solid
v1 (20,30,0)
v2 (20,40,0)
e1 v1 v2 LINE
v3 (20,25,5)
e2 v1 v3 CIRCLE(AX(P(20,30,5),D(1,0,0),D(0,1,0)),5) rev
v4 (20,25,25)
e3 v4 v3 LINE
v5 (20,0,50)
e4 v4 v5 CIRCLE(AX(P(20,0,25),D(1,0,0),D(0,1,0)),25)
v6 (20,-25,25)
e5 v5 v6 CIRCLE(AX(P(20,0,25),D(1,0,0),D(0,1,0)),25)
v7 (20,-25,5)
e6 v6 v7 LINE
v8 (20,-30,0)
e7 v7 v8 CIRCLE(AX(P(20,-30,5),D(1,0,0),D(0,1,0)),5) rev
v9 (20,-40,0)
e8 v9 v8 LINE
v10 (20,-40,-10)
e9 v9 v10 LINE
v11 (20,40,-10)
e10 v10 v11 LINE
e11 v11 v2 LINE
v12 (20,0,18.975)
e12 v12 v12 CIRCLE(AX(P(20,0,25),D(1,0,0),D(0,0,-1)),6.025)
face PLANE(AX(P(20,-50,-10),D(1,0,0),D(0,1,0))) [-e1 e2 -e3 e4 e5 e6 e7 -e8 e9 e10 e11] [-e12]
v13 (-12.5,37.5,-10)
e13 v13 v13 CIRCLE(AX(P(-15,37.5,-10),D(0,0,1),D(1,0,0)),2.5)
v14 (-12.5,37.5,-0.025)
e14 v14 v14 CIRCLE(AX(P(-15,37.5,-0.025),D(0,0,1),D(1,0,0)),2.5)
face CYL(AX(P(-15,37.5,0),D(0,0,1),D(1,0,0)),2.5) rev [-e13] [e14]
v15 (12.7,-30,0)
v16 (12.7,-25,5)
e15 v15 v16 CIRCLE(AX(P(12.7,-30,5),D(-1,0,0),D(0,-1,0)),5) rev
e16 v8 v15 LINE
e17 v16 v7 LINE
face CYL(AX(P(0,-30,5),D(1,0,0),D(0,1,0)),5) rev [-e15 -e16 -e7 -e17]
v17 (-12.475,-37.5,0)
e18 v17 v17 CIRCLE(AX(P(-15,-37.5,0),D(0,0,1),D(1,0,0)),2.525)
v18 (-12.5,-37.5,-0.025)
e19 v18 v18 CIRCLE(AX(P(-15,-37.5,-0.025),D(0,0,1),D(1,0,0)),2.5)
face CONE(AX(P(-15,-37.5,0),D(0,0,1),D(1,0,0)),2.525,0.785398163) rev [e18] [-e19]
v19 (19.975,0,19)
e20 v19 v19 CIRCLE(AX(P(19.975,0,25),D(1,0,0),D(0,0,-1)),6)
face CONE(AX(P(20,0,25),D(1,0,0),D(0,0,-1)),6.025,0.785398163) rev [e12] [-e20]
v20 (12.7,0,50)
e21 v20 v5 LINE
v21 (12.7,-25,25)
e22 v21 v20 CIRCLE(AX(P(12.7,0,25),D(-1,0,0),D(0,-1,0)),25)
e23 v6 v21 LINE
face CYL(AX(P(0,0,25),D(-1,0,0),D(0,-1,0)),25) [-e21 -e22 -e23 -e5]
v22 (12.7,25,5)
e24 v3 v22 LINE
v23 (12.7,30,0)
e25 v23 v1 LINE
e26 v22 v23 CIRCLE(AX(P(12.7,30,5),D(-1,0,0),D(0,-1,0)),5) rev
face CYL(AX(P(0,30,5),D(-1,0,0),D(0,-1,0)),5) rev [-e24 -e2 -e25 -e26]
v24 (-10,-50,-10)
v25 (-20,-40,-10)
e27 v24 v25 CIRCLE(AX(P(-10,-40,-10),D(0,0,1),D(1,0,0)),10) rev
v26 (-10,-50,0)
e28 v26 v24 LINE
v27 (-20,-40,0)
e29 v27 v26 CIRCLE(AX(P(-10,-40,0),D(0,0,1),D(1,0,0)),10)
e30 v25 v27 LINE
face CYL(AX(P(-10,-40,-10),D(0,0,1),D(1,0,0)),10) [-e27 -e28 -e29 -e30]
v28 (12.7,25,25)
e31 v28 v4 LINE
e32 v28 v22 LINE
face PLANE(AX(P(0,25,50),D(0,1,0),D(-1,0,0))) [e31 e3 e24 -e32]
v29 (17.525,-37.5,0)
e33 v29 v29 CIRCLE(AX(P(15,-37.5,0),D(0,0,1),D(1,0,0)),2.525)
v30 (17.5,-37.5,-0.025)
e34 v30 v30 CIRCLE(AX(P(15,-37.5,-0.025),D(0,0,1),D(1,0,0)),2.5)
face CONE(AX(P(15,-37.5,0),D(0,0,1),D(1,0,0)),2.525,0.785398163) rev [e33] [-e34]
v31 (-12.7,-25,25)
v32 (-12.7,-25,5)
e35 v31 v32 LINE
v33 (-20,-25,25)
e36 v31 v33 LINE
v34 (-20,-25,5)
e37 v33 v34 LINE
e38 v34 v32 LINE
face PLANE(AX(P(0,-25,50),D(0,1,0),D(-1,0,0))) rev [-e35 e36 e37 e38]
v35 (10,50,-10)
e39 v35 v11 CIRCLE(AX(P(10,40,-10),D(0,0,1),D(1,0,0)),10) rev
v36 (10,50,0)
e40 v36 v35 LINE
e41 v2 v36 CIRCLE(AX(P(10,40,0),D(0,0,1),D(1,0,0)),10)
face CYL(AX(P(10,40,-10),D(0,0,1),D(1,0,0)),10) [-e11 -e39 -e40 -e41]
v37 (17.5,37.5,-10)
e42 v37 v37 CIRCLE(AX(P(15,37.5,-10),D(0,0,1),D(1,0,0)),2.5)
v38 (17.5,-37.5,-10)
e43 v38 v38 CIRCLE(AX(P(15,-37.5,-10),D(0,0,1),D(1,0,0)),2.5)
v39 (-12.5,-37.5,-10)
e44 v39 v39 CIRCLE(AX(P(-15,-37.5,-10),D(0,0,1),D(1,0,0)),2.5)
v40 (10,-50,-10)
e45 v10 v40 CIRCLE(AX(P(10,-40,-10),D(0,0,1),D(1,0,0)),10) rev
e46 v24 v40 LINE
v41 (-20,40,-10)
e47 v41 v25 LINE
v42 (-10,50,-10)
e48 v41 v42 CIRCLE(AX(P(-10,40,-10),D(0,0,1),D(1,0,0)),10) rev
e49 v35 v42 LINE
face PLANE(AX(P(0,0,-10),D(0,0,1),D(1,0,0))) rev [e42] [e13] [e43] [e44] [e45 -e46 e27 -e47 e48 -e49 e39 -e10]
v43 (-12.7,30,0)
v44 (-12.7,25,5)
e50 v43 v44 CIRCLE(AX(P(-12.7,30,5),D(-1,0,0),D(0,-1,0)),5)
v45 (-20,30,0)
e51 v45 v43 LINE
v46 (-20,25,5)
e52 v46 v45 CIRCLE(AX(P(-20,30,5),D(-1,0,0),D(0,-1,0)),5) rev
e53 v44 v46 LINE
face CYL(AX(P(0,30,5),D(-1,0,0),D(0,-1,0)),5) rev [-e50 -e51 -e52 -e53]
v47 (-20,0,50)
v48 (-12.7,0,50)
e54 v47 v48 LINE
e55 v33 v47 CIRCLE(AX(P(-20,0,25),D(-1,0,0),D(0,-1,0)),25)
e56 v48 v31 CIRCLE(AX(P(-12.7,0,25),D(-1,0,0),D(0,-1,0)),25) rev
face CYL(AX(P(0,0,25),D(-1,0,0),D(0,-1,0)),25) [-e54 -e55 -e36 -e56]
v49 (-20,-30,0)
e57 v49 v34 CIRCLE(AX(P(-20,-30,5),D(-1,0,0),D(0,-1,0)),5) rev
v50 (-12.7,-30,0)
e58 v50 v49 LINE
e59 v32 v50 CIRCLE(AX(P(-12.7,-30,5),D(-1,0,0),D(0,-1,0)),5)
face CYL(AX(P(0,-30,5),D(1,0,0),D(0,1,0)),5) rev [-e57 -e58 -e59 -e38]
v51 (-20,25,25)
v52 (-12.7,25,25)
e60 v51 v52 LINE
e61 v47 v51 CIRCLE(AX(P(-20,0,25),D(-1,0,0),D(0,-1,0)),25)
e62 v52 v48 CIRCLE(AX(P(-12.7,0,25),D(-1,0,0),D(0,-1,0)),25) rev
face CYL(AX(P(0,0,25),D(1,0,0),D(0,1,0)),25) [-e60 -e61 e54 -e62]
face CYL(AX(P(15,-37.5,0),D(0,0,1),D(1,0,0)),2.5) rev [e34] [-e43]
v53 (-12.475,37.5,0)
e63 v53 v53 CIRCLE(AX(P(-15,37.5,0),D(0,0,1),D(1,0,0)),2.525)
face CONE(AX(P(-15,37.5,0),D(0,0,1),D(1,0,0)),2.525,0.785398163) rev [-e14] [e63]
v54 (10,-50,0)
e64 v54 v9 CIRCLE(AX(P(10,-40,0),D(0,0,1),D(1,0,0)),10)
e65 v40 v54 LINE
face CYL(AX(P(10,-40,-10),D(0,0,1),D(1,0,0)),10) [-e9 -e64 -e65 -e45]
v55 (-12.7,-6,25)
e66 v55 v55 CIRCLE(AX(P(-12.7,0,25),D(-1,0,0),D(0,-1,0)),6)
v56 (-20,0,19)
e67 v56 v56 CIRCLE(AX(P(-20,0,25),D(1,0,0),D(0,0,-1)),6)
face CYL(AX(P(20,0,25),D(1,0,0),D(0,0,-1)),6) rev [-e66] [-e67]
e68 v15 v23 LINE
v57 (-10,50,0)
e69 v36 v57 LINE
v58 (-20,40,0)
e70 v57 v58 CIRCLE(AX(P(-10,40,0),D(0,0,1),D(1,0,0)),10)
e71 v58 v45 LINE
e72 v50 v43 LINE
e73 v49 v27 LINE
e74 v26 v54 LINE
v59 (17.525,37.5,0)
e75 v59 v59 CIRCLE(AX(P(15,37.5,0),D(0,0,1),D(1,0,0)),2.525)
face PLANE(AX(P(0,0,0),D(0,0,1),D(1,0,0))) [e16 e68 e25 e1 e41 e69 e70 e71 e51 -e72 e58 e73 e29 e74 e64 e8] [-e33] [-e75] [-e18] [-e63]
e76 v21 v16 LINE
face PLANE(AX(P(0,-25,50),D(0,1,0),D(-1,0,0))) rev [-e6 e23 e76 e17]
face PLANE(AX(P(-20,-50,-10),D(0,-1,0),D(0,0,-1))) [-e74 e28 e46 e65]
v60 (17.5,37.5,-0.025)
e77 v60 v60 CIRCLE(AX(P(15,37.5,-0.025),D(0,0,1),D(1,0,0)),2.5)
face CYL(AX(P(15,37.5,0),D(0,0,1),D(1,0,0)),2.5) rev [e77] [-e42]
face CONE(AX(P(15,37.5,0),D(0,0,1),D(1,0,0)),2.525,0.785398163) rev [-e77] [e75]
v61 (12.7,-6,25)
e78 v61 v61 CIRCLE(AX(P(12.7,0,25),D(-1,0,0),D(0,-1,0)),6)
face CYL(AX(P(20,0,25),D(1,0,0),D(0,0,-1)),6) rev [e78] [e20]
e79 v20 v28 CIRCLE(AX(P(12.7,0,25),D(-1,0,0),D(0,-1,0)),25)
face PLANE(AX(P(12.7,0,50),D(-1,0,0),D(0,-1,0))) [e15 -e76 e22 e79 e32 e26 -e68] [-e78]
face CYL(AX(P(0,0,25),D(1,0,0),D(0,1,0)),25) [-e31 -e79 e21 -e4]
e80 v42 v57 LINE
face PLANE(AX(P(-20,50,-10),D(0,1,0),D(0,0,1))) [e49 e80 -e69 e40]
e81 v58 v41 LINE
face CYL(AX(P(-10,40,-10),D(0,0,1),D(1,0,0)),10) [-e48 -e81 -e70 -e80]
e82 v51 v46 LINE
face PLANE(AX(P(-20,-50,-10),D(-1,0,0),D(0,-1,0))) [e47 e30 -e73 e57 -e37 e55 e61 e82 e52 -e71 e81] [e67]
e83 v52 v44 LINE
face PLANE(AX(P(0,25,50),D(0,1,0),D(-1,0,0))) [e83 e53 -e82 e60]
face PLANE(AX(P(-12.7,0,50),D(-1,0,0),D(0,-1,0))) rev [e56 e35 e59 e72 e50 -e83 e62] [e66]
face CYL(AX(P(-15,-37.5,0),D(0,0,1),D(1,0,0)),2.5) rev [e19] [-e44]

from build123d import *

# Parameters (mm, degrees)
SKETCH1_W                        = 100
SKETCH1_H                        = 40
BOSS_EXTRUDE1_DEPTH              = 10
SKETCH2_W                        = 50
SKETCH2_H                        = 7.3
BOSS_EXTRUDE2_DEPTH              = 50
FILLET1_R                        = 25
F_12_0MM_DOWEL_HOLE1_D           = 12
F_12_0MM_DOWEL_HOLE1_CSINK_D     = 12.05
F_12_0MM_DOWEL_HOLE1_CSINK_ANGLE = 90
F_5_0MM_DOWEL_HOLE1_D            = 5
F_5_0MM_DOWEL_HOLE1_CSINK_D      = 5.05
F_5_0MM_DOWEL_HOLE1_CSINK_ANGLE  = 90
FILLET2_R                        = 10
FILLET3_R                        = 5


with BuildPart() as part:
    # Sketch1 → Boss-Extrude1 (new body)
    with BuildSketch(Plane(origin=(0, 0, 0), x_dir=(0, 1, 0), z_dir=(0, 0, 1))):
        Rectangle(SKETCH1_W, SKETCH1_H)
    extrude(amount=-BOSS_EXTRUDE1_DEPTH)

    # Sketch2 → Boss-Extrude2 (add)
    with BuildSketch(Plane(origin=(0, 0, 0), x_dir=(0, 1, 0), z_dir=(0, 0, 1))):
        with Locations((0, 16.35)):
            Rectangle(SKETCH2_W, SKETCH2_H)
        with Locations((0, -16.35)):
            Rectangle(SKETCH2_W, SKETCH2_H)
    extrude(amount=BOSS_EXTRUDE2_DEPTH)

    # Fillet1
    fillet1_edges = [part.edges().sort_by_distance(p)[0] for p in [
        (16.35, 25, 50),
        (16.35, -25, 50),
        (-16.35, 25, 50),
        (-16.35, -25, 50),
    ]]
    fillet(fillet1_edges, radius=FILLET1_R - 0.0001)  # a hair under: the kernel refuses the full size

    # Ø12.0mm Dowel Hole1 (through all)
    with Locations(Plane.YZ.offset(20)):
        with Locations((0, 25)):
            CounterSinkHole(F_12_0MM_DOWEL_HOLE1_D / 2, F_12_0MM_DOWEL_HOLE1_CSINK_D / 2, counter_sink_angle=F_12_0MM_DOWEL_HOLE1_CSINK_ANGLE)

    # Ø5.0mm Dowel Hole1 (through all)
    with Locations(Plane(origin=(0, 0, 0), x_dir=(0, 1, 0), z_dir=(0, 0, 1))):
        with Locations((37.5, -15), (-37.5, 15), (-37.5, -15), (37.5, 15)):
            CounterSinkHole(F_5_0MM_DOWEL_HOLE1_D / 2, F_5_0MM_DOWEL_HOLE1_CSINK_D / 2, counter_sink_angle=F_5_0MM_DOWEL_HOLE1_CSINK_ANGLE)

    # Fillet2
    fillet2_edges = [part.edges().sort_by_distance(p)[0] for p in [
        (-20, -50, -5),
        (-20, 50, -5),
        (20, 50, -5),
        (20, -50, -5),
    ]]
    fillet(fillet2_edges, radius=FILLET2_R)

    # Fillet3
    fillet3_edges = [part.edges().sort_by_distance(p)[0] for p in [
        (-16.35, -25, 0),
        (-16.35, 25, 0),
        (16.35, -25, 0),
        (16.35, 25, 0),
    ]]
    fillet(fillet3_edges, radius=FILLET3_R)


solid = part.part
